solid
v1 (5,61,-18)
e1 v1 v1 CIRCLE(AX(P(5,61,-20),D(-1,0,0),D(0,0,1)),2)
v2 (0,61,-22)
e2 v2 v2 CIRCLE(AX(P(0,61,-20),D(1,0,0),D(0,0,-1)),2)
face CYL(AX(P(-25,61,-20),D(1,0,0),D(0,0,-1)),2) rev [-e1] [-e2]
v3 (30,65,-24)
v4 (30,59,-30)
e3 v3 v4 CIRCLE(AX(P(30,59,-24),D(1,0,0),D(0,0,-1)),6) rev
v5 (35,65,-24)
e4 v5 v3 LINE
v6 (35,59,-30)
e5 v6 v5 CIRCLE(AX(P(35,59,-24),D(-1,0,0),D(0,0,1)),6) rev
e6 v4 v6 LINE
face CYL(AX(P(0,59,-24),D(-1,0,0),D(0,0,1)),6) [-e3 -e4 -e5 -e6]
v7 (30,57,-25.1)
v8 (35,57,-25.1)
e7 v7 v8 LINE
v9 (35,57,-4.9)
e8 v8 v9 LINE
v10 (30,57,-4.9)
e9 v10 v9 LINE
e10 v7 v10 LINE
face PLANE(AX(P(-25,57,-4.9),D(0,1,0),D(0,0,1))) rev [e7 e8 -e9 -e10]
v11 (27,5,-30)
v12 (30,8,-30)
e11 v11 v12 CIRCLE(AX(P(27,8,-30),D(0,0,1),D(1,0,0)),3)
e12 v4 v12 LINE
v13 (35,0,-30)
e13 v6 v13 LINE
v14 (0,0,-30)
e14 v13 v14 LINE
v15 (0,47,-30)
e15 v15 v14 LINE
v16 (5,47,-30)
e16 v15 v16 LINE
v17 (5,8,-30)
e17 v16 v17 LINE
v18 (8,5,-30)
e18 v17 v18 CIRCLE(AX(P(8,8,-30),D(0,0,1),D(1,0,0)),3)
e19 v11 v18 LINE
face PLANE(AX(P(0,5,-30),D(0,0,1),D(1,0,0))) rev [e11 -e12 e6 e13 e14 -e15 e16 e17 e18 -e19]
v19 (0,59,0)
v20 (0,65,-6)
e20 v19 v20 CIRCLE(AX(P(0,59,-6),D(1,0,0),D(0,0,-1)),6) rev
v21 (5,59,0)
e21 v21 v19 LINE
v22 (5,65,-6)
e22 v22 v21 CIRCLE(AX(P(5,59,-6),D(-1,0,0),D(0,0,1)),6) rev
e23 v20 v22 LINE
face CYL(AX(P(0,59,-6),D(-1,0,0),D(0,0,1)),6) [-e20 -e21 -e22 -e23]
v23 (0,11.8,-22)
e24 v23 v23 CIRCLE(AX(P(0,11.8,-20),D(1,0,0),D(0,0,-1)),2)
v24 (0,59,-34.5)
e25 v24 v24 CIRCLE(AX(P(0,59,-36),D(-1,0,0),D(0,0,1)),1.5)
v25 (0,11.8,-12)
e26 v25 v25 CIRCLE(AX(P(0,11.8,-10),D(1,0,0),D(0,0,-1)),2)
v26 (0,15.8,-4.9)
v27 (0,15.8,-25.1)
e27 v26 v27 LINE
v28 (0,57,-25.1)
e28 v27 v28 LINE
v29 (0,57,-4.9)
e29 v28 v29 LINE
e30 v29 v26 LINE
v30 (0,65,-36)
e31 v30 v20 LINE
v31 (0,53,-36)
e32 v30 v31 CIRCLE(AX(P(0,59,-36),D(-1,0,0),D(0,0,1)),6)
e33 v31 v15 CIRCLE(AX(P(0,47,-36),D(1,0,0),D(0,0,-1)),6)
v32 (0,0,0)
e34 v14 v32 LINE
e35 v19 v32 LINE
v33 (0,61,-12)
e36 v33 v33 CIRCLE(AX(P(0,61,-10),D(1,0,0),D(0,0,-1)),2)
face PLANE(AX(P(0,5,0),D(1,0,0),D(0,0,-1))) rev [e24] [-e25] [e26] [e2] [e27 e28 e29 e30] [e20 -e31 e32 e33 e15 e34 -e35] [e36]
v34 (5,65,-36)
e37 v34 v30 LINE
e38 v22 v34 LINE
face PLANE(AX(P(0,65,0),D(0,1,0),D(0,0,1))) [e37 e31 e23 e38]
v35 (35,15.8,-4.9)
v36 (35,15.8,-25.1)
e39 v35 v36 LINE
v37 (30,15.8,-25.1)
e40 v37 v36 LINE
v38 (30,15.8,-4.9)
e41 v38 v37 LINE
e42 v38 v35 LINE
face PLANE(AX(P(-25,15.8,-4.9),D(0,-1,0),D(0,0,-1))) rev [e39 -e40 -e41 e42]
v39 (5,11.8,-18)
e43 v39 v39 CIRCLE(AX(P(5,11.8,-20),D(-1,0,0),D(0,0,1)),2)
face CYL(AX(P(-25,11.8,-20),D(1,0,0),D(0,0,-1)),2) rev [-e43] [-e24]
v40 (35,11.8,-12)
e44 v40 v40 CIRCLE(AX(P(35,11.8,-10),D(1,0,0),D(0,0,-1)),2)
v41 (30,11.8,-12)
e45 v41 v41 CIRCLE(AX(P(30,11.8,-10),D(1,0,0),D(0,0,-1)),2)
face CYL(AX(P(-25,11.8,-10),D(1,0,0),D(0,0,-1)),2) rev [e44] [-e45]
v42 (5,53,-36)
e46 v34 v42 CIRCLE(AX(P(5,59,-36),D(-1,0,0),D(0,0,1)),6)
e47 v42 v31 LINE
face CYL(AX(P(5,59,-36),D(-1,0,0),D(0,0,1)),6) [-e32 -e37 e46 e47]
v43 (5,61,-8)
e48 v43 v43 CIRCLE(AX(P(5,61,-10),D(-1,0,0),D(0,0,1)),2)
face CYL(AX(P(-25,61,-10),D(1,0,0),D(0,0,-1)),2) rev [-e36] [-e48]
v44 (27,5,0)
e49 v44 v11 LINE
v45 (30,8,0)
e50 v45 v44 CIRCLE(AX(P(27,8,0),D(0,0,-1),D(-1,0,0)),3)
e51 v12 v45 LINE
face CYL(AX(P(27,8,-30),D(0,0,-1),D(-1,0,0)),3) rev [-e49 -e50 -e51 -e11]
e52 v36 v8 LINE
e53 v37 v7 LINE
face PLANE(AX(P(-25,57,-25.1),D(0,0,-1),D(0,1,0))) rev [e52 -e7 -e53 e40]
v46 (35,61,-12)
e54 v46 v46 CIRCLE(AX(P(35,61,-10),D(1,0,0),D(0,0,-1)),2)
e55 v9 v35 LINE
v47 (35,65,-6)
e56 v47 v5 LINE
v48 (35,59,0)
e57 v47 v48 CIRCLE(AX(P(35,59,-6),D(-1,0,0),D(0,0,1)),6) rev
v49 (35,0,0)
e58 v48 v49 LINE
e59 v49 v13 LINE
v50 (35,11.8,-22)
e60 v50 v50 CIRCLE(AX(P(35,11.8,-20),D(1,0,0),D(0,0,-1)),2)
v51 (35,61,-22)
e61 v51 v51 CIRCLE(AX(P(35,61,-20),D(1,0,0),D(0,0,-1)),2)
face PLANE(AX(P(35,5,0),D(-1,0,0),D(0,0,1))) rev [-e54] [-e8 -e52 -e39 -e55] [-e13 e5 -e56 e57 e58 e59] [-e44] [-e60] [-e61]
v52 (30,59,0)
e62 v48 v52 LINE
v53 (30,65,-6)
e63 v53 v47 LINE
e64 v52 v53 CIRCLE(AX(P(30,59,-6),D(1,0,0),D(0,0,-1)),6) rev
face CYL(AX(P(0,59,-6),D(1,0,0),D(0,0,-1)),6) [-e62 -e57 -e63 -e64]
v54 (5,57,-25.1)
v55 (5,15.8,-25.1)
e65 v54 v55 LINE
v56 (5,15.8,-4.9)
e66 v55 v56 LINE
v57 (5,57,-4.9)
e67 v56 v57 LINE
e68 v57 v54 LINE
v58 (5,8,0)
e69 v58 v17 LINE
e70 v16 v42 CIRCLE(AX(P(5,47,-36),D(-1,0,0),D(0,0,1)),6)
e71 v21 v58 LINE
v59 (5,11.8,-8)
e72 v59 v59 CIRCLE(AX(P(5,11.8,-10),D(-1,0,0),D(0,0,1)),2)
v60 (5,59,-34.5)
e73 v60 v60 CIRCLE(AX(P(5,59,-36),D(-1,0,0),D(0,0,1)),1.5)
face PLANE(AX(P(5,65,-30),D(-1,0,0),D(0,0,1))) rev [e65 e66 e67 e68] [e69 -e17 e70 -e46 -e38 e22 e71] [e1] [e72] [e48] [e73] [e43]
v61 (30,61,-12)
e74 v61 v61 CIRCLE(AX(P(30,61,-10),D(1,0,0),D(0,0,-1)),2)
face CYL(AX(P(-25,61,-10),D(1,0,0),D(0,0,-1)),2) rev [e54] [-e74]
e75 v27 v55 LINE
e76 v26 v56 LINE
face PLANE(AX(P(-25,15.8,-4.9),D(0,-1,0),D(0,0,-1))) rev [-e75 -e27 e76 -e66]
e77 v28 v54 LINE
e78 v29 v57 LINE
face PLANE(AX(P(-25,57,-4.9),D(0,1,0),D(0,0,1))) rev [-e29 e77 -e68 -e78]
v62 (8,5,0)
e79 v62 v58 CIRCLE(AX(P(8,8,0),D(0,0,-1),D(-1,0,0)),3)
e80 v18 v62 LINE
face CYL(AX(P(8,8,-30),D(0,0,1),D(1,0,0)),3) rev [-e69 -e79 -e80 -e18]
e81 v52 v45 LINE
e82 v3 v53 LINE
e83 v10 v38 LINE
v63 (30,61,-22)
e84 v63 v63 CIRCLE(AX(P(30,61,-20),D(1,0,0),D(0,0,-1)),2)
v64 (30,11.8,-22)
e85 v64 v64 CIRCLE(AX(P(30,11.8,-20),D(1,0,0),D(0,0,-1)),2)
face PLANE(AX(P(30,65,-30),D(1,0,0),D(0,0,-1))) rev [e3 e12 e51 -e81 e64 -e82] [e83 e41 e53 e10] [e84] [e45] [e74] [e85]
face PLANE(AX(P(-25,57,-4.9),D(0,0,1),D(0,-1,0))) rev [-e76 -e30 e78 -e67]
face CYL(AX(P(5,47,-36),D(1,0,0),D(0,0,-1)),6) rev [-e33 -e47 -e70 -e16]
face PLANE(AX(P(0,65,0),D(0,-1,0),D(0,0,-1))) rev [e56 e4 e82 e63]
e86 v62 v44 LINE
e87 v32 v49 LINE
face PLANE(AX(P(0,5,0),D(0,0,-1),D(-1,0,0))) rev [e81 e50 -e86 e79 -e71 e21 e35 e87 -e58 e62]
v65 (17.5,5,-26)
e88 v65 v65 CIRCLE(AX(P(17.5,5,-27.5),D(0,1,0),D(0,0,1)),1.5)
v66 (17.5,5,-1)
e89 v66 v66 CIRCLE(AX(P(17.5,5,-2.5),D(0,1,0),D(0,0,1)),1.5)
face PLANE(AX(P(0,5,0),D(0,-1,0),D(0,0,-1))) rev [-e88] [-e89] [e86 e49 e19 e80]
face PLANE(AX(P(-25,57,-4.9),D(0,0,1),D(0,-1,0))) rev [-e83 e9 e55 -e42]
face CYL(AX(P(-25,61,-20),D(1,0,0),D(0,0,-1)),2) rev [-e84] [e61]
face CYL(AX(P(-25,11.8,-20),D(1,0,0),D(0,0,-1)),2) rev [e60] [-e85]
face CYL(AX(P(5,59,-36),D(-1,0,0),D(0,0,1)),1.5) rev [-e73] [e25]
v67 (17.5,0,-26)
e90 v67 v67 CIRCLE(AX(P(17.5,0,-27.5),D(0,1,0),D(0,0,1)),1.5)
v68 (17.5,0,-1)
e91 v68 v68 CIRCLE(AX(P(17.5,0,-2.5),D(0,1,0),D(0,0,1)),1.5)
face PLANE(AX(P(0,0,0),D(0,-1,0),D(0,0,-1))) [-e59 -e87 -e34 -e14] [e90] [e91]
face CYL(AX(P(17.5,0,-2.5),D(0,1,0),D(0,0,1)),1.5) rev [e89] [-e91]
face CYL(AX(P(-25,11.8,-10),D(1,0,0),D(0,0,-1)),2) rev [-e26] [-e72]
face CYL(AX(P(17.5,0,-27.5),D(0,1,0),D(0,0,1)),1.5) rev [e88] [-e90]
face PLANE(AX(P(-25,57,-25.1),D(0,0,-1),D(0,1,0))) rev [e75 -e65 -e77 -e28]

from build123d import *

# Parameters (mm, degrees)
SKETCH1_W           = 35
SKETCH1_H           = 30
BOSS_EXTRUDE3_DEPTH = 5
SKETCH5_W           = 5
SKETCH5_H           = 30
BOSS_EXTRUDE4_DEPTH = 60
SKETCH6_R           = 2
SKETCH6_W           = 20.2
SKETCH6_H           = 41.2
CUT_EXTRUDE1_DEPTH  = 60
FILLET2_R           = 3
BOSS_EXTRUDE7_DEPTH = 5
FILLET3_R           = 6
SKETCH10_R          = 1.5
CUT_EXTRUDE2_DEPTH  = 5
FILLET4_R           = 6


with BuildPart() as part:
    # Sketch1 → Boss-Extrude3 (new body)
    with BuildSketch(Plane(origin=(0, 0, 0), x_dir=(1, 0, 0), z_dir=(0, 1, 0))):
        with Locations((17.5, 15)):
            Rectangle(SKETCH1_W, SKETCH1_H)
    extrude(amount=BOSS_EXTRUDE3_DEPTH)

    # Sketch5 → Boss-Extrude4 (add)
    with BuildSketch(Plane(origin=(0, 5, 0), x_dir=(1, 0, 0), z_dir=(0, 1, 0))):
        with Locations((2.5, 15)):
            Rectangle(SKETCH5_W, SKETCH5_H)
        with Locations((32.5, 15)):
            Rectangle(SKETCH5_W, SKETCH5_H)
    extrude(amount=BOSS_EXTRUDE4_DEPTH)

    # Sketch6 → Cut-Extrude1 (cut)
    with BuildSketch(Plane(origin=(35, 0, 0), x_dir=(0, 0, -1), z_dir=(1, 0, 0))):
        with Locations((10, 61)):
            Circle(SKETCH6_R)
        with Locations((20, 61)):
            Circle(SKETCH6_R)
        with Locations((10, 11.8)):
            Circle(SKETCH6_R)
        with Locations((20, 11.8)):
            Circle(SKETCH6_R)
        with Locations((15, 36.4)):
            Rectangle(SKETCH6_W, SKETCH6_H)
    extrude(amount=-CUT_EXTRUDE1_DEPTH, mode=Mode.SUBTRACT)

    # Fillet2
    fillet2_edges = [part.edges().sort_by_distance(p)[0] for p in [
        (5, 5, -15),
        (30, 5, -15),
    ]]
    fillet(fillet2_edges, radius=FILLET2_R)

    # Sketch8 → Boss-Extrude7 (add)
    with BuildSketch(Plane.ZY):
        with BuildLine():
            ThreePointArc((-30, 59), (-31.757359313, 63.242640687), (-36, 65))
            Line((-36, 65), (-36, 60.5))
            ThreePointArc((-36, 60.5), (-34.939339828, 60.060660172), (-34.5, 59))
            ThreePointArc((-34.5, 59), (-34.939339828, 57.939339828), (-36, 57.5))
            Line((-36, 57.5), (-36, 53))
            ThreePointArc((-36, 53), (-31.757359313, 54.757359313), (-30, 59))
        make_face()
        with BuildLine():
            Line((-36, 60.5), (-36, 65))
            ThreePointArc((-36, 65), (-42, 59), (-36, 53))
            Line((-36, 53), (-36, 57.5))
            ThreePointArc((-36, 57.5), (-37.5, 59), (-36, 60.5))
        make_face()
        with BuildLine():
            Line((-30, 59), (-30, 65))
            Line((-30, 65), (-36, 65))
            ThreePointArc((-36, 65), (-31.757359313, 63.242640687), (-30, 59))
        make_face()
        with BuildLine():
            Line((-30, 53), (-30, 59))
            ThreePointArc((-30, 59), (-31.757359313, 54.757359313), (-36, 53))
            Line((-36, 53), (-30, 53))
        make_face()
    extrude(amount=-BOSS_EXTRUDE7_DEPTH)

    # Fillet3
    fillet3_edges = [part.edges().sort_by_distance(p)[0] for p in [
        (2.5, 53, -30),
    ]]
    fillet(fillet3_edges, radius=FILLET3_R - 0.0001)  # a hair under: the kernel refuses the full size

    # Sketch10 → Cut-Extrude2 (cut)
    with BuildSketch(Plane(origin=(0, 5, 0), x_dir=(1, 0, 0), z_dir=(0, 1, 0))):
        with Locations(Location((17.5, 27.5, 0), (0, 0, 270))):
            Circle(SKETCH10_R)
        with Locations(Location((17.5, 2.5, 0), (0, 0, 270))):
            Circle(SKETCH10_R)
    extrude(amount=-CUT_EXTRUDE2_DEPTH, mode=Mode.SUBTRACT)

    # Fillet4
    fillet4_edges = [part.edges().sort_by_distance(p)[0] for p in [
        (2.5, 65, 0),
        (32.5, 65, -30),
        (32.5, 65, 0),
    ]]
    fillet(fillet4_edges, radius=FILLET4_R)


solid = part.part
